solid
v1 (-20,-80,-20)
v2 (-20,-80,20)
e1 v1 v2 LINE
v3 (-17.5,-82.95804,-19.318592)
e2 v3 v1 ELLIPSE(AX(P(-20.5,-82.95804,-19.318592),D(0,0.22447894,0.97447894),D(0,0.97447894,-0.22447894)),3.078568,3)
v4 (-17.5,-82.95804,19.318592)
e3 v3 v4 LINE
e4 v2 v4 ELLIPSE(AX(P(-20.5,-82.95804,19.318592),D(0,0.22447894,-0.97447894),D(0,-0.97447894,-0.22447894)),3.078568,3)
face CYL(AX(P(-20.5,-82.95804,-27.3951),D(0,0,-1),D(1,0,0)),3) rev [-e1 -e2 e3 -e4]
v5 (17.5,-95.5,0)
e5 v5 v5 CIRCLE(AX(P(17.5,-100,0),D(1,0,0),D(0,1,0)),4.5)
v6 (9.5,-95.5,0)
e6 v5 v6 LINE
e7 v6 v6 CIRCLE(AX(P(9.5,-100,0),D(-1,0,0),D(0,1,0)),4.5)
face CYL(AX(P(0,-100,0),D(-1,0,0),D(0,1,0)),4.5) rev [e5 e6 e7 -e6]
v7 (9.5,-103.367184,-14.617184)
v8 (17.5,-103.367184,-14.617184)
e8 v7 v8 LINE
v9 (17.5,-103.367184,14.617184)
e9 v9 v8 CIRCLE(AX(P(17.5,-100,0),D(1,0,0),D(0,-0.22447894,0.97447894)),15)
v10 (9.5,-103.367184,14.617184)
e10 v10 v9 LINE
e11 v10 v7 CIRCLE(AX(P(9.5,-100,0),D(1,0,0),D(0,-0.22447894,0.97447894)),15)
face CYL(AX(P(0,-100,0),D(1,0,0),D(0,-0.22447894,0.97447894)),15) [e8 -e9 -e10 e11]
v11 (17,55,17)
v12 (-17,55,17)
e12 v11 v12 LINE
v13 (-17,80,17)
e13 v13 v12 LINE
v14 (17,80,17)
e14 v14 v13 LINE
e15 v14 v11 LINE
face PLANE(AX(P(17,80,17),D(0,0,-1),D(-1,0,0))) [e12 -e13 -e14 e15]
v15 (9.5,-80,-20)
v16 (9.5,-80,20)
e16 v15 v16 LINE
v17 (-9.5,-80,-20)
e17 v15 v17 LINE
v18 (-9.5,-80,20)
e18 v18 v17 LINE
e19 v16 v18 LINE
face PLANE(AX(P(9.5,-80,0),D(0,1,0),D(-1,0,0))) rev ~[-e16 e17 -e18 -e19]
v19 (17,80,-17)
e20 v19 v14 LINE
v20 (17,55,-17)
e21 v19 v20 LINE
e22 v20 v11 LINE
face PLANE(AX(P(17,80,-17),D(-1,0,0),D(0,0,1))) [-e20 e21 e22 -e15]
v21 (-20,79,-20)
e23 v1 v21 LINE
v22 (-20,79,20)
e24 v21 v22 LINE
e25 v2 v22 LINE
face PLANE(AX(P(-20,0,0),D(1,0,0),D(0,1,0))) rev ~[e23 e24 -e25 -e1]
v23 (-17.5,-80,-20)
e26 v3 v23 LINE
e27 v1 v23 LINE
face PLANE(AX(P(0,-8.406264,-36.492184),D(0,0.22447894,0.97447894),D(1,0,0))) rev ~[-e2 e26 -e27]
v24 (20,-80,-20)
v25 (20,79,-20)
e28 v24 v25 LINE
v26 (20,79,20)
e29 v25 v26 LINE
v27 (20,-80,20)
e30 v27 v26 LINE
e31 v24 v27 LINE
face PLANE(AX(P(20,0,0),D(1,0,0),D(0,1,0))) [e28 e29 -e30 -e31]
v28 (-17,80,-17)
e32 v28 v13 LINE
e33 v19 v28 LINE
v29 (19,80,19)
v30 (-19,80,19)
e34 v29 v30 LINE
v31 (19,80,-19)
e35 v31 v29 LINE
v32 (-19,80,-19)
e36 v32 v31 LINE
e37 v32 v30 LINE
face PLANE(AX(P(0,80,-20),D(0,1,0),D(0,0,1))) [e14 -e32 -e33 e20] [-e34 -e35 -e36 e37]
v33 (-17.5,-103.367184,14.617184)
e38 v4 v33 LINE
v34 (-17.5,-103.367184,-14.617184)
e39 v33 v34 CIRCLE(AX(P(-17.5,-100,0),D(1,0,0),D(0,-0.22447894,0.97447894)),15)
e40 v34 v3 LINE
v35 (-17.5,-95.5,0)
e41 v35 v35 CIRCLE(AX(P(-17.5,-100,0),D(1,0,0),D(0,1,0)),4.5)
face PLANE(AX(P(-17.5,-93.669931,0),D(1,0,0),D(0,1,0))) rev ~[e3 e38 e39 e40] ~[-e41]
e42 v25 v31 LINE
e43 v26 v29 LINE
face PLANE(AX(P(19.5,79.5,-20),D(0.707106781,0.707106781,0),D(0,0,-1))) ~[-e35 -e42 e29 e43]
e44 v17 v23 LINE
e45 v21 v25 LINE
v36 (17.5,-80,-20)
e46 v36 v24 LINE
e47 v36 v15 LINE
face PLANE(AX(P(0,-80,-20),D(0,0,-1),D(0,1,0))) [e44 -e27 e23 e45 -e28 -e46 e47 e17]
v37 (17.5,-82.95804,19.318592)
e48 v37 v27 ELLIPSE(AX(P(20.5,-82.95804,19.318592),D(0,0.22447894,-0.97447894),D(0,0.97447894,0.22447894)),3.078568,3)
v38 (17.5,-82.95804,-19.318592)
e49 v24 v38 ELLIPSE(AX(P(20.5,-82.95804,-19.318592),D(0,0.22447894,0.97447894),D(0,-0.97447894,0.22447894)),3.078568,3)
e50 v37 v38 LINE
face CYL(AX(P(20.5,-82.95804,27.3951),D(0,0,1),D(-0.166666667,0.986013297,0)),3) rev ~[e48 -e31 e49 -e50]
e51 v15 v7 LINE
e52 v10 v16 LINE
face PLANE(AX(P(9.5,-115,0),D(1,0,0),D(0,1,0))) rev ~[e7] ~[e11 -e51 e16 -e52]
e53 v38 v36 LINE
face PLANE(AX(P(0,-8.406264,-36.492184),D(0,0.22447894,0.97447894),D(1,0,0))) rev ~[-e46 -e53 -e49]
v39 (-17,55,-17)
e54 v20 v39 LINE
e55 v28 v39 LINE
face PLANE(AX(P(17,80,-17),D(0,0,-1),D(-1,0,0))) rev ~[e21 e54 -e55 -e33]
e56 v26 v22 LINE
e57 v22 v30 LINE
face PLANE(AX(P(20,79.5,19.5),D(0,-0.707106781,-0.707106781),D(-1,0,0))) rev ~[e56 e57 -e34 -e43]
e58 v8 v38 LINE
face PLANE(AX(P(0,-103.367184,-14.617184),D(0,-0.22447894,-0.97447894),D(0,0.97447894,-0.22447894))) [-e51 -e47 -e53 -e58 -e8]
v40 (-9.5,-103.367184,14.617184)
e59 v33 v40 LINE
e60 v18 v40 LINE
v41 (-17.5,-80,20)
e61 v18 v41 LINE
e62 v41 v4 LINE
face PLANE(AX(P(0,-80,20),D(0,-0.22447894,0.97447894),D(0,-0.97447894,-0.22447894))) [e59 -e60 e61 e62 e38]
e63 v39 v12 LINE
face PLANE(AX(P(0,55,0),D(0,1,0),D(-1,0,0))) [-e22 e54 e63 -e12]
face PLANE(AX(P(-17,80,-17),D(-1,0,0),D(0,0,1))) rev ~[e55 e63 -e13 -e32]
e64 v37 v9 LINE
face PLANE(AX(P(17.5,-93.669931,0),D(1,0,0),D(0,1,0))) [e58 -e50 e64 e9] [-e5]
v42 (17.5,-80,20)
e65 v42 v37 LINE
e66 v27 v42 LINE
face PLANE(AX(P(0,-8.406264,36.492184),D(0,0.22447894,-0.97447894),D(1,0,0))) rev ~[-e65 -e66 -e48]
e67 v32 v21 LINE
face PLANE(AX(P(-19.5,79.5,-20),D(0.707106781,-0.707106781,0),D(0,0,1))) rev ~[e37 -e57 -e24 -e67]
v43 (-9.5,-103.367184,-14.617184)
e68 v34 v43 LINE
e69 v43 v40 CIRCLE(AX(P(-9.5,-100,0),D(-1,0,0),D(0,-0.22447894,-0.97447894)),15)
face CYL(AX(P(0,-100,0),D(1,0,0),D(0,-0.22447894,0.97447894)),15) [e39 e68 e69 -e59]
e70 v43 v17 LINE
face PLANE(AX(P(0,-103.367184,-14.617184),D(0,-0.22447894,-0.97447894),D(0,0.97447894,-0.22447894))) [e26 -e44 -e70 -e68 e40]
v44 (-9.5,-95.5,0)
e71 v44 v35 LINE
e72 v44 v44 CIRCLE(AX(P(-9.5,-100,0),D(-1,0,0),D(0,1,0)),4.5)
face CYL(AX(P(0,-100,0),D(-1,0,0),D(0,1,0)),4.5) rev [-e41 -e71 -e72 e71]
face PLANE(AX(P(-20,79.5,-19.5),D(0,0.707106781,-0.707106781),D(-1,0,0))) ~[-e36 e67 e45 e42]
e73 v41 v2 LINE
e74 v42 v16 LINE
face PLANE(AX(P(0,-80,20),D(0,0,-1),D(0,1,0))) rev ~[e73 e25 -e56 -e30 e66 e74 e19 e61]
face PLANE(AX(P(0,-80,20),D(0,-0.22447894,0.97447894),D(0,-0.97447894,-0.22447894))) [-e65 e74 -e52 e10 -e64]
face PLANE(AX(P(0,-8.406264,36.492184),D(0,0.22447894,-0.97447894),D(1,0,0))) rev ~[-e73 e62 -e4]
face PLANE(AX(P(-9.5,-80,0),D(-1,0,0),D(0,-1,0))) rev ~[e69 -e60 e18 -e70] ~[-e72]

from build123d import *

# Parameters (mm, degrees)
F0_W         = 160
F0_H         = 40
F1_DEPTH     = 20
F2_W         = 34
F2_H         = 34
F3_DEPTH     = 25
F4_R         = 4.5
F5_DEPTH     = 17.5
F7_DEPTH     = 25
F8_T4_DEPTH  = 54.7901994578
F8_T10_DEPTH = 54.7901994578
F9_SIZE      = 1


# Not quite as in the source:
# - a fillet or chamfer that OpenCascade refuses, or shapes differently, is made with other operations: its cross-section is extruded or revolved along the edge and cut away or added


with BuildPart() as f1:
    # F0 (on Right) → F1 (new body, symmetric)
    with BuildSketch(Plane.YZ):
        Rectangle(F0_W, F0_H)
    extrude(amount=F1_DEPTH, both=True)

    # F2 (on face) → F3 (cut)
    with BuildSketch(Plane(origin=(0, 80, 0), x_dir=(-1, 0, 0), z_dir=(0, 1, 0))):
        Rectangle(F2_W, F2_H)
    extrude(amount=-F3_DEPTH, mode=Mode.SUBTRACT)

    # F4 (on Right) → F5 (join, symmetric)
    with BuildSketch(Plane.YZ):
        with BuildLine():
            Line((-80, 20), (-103.3671841062, 14.6171841062))
            ThreePointArc((-103.3671841062, 14.6171841062), (-115, 0), (-103.3671841062, -14.6171841062))
            Line((-103.3671841062, -14.6171841062), (-80, -20))
            Line((-80, -20), (-80, 0))
            Line((-80, 0), (-80, 20))
        make_face()
        with Locations((-100, 0)):
            Circle(F4_R, mode=Mode.SUBTRACT)
    extrude(amount=F5_DEPTH, both=True)

    # F6 (on Top) → F7 (cut, symmetric)
    with BuildSketch(Plane.XY):
        Polygon((-9.5, -115), (0, -115), (9.5, -115), (9.5, -80), (-9.5, -80), align=None)
    extrude(amount=F7_DEPTH, both=True, mode=Mode.SUBTRACT)

    # F8: fillet of radius 3 on 2 edges, made by hand


with BuildPart() as f8_tool2:
    # F8_s3 → F8_t4 (new body)
    with BuildSketch(Plane.XY.offset(-27.3950997289)):
        with BuildLine():
            ThreePointArc((-17.5, -82.9580398916), (-18.2087121525, -81.0215482184), (-20, -80))
            Line((-20, -80), (-17.5, -80))
            Line((-17.5, -80), (-17.5, -82.9580398916))
        make_face()
    extrude(amount=F8_T4_DEPTH)

    split(bisect_by=Plane(origin=(0, -8.4062635752, 36.4921841062), x_dir=(1, 0, 0), z_dir=(0, 0.2244789404, -0.9744789404)), keep=Keep.TOP)

    split(bisect_by=Plane(origin=(0, -8.4062635752, -36.4921841062), x_dir=(1, 0, 0), z_dir=(0, 0.2244789404, 0.9744789404)), keep=Keep.TOP)


with BuildPart() as f1_1:
    add(f1.part)

    # F8_t1: union F8_tool2
    add(f8_tool2.part)


with BuildPart() as f8_tool8:
    # F8_s9 → F8_t10 (new body)
    with BuildSketch(Plane.XY.offset(27.3950997289)):
        with BuildLine():
            ThreePointArc((20, -80), (18.2087121525, -81.0215482184), (17.5, -82.9580398916))
            Line((17.5, -82.9580398916), (17.5, -80))
            Line((17.5, -80), (20, -80))
        make_face()
    extrude(amount=-F8_T10_DEPTH)

    split(bisect_by=Plane(origin=(0, -8.4062635752, -36.4921841062), x_dir=(1, 0, 0), z_dir=(0, 0.2244789404, 0.9744789404)), keep=Keep.TOP)

    split(bisect_by=Plane(origin=(0, -8.4062635752, 36.4921841062), x_dir=(1, 0, 0), z_dir=(0, 0.2244789404, -0.9744789404)), keep=Keep.TOP)


with BuildPart() as f1_2:
    add(f1_1.part)

    # F8_t7: union F8_tool8
    add(f8_tool8.part)

    # F9
    f9_edges = [f1_2.edges().sort_by_distance(p)[0] for p in [
        (0, 80, 20),
        (-20, 80, 0),
        (0, 80, -20),
        (20, 80, 0),
    ]]
    chamfer(f9_edges, length=F9_SIZE)


solid = f1_2.part
